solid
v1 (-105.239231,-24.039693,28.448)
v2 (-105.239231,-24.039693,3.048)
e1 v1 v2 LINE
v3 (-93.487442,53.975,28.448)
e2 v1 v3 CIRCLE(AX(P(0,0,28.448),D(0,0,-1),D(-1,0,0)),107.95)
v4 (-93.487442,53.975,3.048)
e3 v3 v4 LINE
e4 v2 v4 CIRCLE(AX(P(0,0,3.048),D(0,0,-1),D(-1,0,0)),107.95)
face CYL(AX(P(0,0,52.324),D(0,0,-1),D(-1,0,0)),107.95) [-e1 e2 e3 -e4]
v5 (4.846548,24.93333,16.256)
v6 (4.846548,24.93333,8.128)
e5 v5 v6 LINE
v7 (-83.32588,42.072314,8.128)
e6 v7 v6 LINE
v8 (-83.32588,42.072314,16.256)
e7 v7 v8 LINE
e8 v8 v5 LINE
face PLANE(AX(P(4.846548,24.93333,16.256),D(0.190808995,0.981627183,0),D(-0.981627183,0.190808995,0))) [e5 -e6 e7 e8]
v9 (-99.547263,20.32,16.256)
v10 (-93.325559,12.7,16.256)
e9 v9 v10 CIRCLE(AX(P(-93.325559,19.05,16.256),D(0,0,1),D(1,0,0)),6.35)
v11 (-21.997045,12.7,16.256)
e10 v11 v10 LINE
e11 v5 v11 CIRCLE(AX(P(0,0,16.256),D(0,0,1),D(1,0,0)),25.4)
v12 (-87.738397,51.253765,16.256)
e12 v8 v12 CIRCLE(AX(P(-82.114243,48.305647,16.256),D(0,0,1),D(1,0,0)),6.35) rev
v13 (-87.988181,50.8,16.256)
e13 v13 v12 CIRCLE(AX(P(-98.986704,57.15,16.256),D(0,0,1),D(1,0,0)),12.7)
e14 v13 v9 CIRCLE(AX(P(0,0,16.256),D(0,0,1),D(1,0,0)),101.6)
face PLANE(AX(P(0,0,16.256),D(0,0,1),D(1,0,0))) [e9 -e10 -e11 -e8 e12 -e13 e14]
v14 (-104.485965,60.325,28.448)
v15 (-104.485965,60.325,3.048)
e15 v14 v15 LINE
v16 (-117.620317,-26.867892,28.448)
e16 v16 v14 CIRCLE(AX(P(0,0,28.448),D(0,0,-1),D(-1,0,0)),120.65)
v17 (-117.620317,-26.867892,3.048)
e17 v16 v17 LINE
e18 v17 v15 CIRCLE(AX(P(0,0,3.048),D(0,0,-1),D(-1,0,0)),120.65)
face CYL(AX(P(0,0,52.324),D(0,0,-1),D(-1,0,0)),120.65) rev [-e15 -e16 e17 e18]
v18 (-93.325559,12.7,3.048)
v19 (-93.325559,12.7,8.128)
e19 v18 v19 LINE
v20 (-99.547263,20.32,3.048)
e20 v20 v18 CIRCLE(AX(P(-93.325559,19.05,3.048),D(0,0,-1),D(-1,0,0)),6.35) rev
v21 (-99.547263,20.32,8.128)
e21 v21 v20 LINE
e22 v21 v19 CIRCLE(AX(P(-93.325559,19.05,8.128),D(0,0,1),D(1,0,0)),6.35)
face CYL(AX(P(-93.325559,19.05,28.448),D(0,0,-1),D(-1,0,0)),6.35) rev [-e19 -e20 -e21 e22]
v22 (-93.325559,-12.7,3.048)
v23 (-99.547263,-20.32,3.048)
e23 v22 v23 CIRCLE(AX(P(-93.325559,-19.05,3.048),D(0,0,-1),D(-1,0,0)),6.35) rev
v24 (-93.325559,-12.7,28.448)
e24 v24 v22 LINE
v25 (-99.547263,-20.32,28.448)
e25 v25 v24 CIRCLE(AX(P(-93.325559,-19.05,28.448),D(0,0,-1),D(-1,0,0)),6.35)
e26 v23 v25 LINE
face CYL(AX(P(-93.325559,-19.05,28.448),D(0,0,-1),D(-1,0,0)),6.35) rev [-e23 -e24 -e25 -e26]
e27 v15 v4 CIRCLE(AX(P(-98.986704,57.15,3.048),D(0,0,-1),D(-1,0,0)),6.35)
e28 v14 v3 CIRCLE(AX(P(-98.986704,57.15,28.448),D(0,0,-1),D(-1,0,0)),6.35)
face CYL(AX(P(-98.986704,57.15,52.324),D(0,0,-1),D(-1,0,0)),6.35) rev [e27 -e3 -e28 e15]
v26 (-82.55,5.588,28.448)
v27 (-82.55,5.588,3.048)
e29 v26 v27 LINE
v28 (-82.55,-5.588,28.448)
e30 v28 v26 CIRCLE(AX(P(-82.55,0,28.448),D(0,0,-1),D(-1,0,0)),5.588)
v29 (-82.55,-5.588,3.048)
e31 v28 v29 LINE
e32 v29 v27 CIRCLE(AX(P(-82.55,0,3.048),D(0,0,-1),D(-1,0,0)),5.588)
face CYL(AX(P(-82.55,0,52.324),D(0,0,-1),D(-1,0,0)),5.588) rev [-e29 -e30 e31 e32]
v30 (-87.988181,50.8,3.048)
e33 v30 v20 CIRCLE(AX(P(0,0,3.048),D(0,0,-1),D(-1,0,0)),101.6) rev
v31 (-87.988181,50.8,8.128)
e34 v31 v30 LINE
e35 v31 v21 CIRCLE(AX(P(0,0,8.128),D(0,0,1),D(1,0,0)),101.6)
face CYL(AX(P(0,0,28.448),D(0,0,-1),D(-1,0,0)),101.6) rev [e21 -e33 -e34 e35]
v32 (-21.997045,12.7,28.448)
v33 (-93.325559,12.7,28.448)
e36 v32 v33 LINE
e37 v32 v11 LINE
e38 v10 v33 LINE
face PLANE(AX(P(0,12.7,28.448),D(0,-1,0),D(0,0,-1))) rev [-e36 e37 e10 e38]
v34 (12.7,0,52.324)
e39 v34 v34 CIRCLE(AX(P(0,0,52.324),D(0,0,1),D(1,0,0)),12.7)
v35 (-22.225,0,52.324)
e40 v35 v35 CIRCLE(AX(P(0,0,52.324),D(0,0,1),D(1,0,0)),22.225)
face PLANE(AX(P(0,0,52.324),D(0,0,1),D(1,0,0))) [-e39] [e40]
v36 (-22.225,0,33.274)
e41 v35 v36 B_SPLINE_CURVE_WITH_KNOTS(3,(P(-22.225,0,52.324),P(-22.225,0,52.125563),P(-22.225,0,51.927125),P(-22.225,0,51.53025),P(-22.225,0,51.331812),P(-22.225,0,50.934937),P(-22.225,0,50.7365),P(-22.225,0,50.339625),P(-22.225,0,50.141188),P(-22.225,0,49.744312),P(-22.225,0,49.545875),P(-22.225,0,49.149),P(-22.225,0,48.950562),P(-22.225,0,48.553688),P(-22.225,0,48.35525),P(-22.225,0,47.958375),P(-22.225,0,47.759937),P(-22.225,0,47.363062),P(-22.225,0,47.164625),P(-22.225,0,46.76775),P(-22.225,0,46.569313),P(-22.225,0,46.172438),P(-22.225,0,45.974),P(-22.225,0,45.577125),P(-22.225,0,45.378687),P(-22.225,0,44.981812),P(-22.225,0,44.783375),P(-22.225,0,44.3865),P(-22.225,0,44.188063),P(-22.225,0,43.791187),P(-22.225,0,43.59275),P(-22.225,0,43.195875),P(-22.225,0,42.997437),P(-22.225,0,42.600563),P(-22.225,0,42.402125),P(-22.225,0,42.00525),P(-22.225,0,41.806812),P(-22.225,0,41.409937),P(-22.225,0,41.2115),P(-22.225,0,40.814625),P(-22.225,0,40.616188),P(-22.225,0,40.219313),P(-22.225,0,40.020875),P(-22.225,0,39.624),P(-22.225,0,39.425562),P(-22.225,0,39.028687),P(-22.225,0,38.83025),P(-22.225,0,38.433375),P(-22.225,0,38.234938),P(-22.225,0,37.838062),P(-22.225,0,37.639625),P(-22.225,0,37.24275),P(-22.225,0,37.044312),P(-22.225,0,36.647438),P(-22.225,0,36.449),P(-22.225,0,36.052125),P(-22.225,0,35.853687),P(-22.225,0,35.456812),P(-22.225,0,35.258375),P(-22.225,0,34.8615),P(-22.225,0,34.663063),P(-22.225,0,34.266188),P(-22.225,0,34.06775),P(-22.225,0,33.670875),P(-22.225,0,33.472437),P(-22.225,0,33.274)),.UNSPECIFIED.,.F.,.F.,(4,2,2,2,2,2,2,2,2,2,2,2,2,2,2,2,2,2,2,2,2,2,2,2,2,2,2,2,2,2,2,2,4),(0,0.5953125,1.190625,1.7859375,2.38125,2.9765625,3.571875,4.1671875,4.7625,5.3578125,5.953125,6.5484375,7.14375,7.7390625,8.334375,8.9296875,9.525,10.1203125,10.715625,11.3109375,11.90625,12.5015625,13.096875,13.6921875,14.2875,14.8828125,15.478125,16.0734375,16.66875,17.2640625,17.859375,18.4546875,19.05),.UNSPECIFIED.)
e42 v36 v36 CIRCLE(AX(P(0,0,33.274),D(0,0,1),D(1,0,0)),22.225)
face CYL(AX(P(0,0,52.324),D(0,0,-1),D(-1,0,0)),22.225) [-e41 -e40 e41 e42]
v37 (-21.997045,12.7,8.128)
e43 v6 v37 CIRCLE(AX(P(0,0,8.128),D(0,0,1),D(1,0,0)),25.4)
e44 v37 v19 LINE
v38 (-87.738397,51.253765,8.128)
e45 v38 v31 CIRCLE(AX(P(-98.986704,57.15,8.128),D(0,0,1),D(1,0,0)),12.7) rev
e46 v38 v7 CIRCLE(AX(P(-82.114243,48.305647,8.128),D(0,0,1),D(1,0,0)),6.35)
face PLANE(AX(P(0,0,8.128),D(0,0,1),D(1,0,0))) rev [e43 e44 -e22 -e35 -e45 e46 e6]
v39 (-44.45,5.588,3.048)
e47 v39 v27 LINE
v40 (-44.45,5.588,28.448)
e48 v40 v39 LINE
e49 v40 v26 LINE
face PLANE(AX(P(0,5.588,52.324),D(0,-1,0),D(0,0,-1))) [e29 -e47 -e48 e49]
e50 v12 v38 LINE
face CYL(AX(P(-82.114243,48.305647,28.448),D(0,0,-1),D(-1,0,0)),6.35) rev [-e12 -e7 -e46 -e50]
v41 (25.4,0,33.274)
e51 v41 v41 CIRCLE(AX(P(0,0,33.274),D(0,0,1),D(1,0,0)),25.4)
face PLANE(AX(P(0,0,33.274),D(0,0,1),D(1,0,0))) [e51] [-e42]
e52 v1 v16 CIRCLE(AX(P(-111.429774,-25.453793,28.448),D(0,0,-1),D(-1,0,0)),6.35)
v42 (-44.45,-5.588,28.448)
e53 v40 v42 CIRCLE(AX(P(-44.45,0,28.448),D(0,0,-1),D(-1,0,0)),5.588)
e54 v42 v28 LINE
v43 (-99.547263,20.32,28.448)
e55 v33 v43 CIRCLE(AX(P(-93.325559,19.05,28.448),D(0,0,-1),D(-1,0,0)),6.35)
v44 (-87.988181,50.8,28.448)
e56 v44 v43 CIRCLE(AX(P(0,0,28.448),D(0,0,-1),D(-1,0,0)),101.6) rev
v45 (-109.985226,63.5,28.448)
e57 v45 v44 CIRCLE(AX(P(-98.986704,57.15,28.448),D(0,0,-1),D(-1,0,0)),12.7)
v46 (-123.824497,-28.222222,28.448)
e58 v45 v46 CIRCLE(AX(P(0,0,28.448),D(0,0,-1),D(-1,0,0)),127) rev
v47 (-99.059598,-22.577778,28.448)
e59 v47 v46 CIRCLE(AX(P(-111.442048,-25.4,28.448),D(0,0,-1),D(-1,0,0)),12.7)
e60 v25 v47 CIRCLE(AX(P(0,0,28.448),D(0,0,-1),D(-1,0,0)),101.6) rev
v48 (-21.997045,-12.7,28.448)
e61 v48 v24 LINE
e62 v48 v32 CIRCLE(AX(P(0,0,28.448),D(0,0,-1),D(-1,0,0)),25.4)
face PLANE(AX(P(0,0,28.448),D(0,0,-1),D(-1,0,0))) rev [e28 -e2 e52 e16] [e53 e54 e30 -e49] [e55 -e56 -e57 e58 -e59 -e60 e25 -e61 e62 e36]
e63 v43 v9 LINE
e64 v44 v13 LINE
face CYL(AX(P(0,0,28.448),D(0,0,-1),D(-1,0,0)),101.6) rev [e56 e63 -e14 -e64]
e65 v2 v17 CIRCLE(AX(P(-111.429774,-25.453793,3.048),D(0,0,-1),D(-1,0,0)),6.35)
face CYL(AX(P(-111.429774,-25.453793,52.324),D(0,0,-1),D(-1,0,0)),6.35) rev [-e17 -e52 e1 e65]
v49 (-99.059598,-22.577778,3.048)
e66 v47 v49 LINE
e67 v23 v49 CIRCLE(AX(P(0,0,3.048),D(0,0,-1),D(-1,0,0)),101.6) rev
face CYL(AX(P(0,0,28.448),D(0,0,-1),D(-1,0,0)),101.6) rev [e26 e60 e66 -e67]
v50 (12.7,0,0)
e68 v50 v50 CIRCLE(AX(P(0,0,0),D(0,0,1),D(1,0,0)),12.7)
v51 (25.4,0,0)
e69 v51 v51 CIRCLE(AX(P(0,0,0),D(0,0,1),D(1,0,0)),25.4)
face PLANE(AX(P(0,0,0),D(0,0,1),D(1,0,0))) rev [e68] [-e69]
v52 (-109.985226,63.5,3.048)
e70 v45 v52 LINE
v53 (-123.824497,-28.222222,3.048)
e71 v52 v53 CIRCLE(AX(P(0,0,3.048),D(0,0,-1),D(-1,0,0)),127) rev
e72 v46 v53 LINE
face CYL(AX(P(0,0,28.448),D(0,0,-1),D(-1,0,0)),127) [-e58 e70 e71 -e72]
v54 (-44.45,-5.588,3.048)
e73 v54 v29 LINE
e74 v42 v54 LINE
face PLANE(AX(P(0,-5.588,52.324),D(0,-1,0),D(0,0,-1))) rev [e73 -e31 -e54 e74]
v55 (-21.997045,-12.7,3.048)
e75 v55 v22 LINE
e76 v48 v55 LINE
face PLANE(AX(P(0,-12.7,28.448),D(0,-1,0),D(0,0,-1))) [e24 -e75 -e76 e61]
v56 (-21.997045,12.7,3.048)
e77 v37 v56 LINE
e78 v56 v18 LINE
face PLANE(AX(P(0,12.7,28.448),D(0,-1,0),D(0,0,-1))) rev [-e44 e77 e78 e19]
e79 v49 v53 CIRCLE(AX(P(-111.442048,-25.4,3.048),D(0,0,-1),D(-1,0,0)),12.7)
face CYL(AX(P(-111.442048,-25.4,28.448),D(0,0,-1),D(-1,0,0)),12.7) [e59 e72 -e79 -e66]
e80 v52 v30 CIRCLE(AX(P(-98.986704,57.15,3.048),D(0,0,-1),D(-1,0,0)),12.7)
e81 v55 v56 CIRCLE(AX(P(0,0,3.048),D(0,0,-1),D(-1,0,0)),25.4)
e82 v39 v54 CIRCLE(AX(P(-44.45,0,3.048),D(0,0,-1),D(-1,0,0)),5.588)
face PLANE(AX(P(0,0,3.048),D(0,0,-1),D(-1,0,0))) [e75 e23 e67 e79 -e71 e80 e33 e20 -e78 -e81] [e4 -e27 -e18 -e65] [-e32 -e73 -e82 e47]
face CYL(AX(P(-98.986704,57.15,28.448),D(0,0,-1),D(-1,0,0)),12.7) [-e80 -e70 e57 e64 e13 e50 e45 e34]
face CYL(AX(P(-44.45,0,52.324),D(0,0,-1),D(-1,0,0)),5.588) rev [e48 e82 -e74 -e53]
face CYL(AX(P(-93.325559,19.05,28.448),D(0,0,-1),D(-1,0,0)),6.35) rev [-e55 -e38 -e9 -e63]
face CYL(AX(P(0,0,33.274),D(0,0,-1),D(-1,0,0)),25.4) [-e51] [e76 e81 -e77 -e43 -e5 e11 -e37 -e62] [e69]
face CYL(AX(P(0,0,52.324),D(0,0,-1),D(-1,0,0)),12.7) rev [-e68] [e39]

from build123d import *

# Parameters (mm, degrees)
SKETCH1_R           = 25.4
BOSS_EXTRUDE1_DEPTH = 33.274
SKETCH2_R           = 22.225
BOSS_EXTRUDE2_DEPTH = 19.05
SKETCH3_R           = 12.7
CUT_EXTRUDE2_DEPTH  = 64.467479673
BOSS_EXTRUDE3_DEPTH = 25.4
FILLET1_R           = 6.35
FILLET2_R           = 6.35
CUT_EXTRUDE3_DEPTH  = 154.088688922
BOSS_EXTRUDE4_DEPTH = 8.128
FILLET3_R           = 6.35


with BuildPart() as part:
    # Sketch1 → Boss-Extrude1 (new body)
    with BuildSketch(Plane.XY):
        Circle(SKETCH1_R)
    extrude(amount=BOSS_EXTRUDE1_DEPTH)

    # Sketch2 → Boss-Extrude2 (add)
    with BuildSketch(Plane.XY.offset(33.274)):
        with Locations(Location((0, 0, 0), (0, 0, 180))):
            Circle(SKETCH2_R)
    extrude(amount=BOSS_EXTRUDE2_DEPTH)

    # Sketch3 → Cut-Extrude2 (cut, through all)
    with BuildSketch(Plane.XY):
        Circle(SKETCH3_R)
    extrude(amount=CUT_EXTRUDE2_DEPTH, mode=Mode.SUBTRACT)

    # Sketch5 → Boss-Extrude3 (add)
    with BuildSketch(Plane(origin=(0, 0, 3.048), x_dir=(-1, 0, 0), z_dir=(0, 0, -1))):
        with BuildLine():
            Line((100.803124952, 12.7), (21.997045256, 12.7))
            ThreePointArc((21.997045256, 12.7), (24.534515988, 6.574003746), (25.4, 0))
            ThreePointArc((25.4, 0), (24.534515988, -6.574003746), (21.997045256, -12.7))
            Line((21.997045256, -12.7), (100.803124952, -12.7))
            ThreePointArc((100.803124952, -12.7), (100.053333913, -17.660418251), (99.059597973, -22.577777778))
            ThreePointArc((99.059597973, -22.577777778), (108.619825498, -37.782449747), (123.824497467, -28.222222222))
            ThreePointArc((123.824497467, -28.222222222), (125.578613792, 18.9476056), (109.985226281, 63.5))
            ThreePointArc((109.985226281, 63.5), (92.636703653, 68.148522628), (87.988181024, 50.8))
            ThreePointArc((87.988181024, 50.8), (96.298711326, 32.390094118), (100.803124952, 12.7))
        make_face()
    extrude(amount=-BOSS_EXTRUDE3_DEPTH)

    # Fillet1
    fillet1_edges = [part.edges().sort_by_distance(p)[0] for p in [
        (-100.803124952, 12.7, 15.748),
    ]]
    fillet(fillet1_edges, radius=FILLET1_R)

    # Fillet2
    fillet2_edges = [part.edges().sort_by_distance(p)[0] for p in [
        (-100.803124952, -12.7, 15.748),
    ]]
    fillet(fillet2_edges, radius=FILLET2_R)

    # Sketch6 → Cut-Extrude3 (cut, through all)
    with BuildSketch(Plane(origin=(0, 0, 3.048), x_dir=(-1, 0, 0), z_dir=(0, 0, -1))):
        with BuildLine():
            Line((44.45, -5.588), (82.55, -5.588))
            ThreePointArc((82.55, -5.588), (88.138, 0), (82.55, 5.588))
            Line((82.55, 5.588), (44.45, 5.588))
            ThreePointArc((44.45, 5.588), (38.862, 0), (44.45, -5.588))
        make_face()
        with BuildLine():
            ThreePointArc((117.620316517, -26.867892407), (119.3040242, 17.971430377), (104.485964967, 60.325))
            ThreePointArc((104.485964967, 60.325), (95.811703653, 62.649261314), (93.487442339, 53.975))
            ThreePointArc((93.487442339, 53.975), (106.745705863, 16.079700863), (105.239230568, -24.039693207))
            ThreePointArc((105.239230568, -24.039693207), (110.015673942, -31.644335781), (117.620316517, -26.867892407))
        make_face()
    extrude(amount=-CUT_EXTRUDE3_DEPTH, mode=Mode.SUBTRACT)

    # Sketch7 → Boss-Extrude4 (add)
    with BuildSketch(Plane.XY.offset(8.128)):
        with BuildLine():
            Line((-93.3255592, 12.7), (-21.997045256, 12.7))
            ThreePointArc((-21.997045256, 12.7), (-10.533208363, 23.11301628), (4.846548483, 24.93333046))
            Line((4.846548483, 24.93333046), (-91.719825153, 43.703932019))
            ThreePointArc((-91.719825153, 43.703932019), (-96.345611399, 32.250320373), (-99.547263147, 20.32))
            ThreePointArc((-99.547263147, 20.32), (-98.24424805, 15.033907372), (-93.3255592, 12.7))
        make_face()
    extrude(amount=BOSS_EXTRUDE4_DEPTH)

    # Fillet3
    # the kernel refuses this fillet: 6.35 mm, written as the material it adds along each edge
    with BuildSketch(Plane(origin=(-91.719825153, 43.703932019, 8.128), x_dir=(0.4664648604868203, 0.8845397299901295, 0), z_dir=(0, 0, 1))) as fillet3_piece_1:
        with BuildLine():
            CenterArc((8.551066202, -6.349980485), FILLET3_R, 90.142046539, 106.663020028)
            Line((2.472249714, -8.185869942), (1.864368065, -8.369458888))
            Line((1.864368065, -8.369458888), (-0.607881649, -0.183588946))
            Line((-0.607881649, -0.183588946), (-0.02578882, 0.634476112))
            ThreePointArc((-0.02578882, 0.634476112), (8.041755062, 0.643812976), (8.533749149, 0.634998049))
            Line((8.533749149, 0.634998049), (8.535323427, 0))
        make_face()
    extrude(amount=8.128)


solid = part.part
